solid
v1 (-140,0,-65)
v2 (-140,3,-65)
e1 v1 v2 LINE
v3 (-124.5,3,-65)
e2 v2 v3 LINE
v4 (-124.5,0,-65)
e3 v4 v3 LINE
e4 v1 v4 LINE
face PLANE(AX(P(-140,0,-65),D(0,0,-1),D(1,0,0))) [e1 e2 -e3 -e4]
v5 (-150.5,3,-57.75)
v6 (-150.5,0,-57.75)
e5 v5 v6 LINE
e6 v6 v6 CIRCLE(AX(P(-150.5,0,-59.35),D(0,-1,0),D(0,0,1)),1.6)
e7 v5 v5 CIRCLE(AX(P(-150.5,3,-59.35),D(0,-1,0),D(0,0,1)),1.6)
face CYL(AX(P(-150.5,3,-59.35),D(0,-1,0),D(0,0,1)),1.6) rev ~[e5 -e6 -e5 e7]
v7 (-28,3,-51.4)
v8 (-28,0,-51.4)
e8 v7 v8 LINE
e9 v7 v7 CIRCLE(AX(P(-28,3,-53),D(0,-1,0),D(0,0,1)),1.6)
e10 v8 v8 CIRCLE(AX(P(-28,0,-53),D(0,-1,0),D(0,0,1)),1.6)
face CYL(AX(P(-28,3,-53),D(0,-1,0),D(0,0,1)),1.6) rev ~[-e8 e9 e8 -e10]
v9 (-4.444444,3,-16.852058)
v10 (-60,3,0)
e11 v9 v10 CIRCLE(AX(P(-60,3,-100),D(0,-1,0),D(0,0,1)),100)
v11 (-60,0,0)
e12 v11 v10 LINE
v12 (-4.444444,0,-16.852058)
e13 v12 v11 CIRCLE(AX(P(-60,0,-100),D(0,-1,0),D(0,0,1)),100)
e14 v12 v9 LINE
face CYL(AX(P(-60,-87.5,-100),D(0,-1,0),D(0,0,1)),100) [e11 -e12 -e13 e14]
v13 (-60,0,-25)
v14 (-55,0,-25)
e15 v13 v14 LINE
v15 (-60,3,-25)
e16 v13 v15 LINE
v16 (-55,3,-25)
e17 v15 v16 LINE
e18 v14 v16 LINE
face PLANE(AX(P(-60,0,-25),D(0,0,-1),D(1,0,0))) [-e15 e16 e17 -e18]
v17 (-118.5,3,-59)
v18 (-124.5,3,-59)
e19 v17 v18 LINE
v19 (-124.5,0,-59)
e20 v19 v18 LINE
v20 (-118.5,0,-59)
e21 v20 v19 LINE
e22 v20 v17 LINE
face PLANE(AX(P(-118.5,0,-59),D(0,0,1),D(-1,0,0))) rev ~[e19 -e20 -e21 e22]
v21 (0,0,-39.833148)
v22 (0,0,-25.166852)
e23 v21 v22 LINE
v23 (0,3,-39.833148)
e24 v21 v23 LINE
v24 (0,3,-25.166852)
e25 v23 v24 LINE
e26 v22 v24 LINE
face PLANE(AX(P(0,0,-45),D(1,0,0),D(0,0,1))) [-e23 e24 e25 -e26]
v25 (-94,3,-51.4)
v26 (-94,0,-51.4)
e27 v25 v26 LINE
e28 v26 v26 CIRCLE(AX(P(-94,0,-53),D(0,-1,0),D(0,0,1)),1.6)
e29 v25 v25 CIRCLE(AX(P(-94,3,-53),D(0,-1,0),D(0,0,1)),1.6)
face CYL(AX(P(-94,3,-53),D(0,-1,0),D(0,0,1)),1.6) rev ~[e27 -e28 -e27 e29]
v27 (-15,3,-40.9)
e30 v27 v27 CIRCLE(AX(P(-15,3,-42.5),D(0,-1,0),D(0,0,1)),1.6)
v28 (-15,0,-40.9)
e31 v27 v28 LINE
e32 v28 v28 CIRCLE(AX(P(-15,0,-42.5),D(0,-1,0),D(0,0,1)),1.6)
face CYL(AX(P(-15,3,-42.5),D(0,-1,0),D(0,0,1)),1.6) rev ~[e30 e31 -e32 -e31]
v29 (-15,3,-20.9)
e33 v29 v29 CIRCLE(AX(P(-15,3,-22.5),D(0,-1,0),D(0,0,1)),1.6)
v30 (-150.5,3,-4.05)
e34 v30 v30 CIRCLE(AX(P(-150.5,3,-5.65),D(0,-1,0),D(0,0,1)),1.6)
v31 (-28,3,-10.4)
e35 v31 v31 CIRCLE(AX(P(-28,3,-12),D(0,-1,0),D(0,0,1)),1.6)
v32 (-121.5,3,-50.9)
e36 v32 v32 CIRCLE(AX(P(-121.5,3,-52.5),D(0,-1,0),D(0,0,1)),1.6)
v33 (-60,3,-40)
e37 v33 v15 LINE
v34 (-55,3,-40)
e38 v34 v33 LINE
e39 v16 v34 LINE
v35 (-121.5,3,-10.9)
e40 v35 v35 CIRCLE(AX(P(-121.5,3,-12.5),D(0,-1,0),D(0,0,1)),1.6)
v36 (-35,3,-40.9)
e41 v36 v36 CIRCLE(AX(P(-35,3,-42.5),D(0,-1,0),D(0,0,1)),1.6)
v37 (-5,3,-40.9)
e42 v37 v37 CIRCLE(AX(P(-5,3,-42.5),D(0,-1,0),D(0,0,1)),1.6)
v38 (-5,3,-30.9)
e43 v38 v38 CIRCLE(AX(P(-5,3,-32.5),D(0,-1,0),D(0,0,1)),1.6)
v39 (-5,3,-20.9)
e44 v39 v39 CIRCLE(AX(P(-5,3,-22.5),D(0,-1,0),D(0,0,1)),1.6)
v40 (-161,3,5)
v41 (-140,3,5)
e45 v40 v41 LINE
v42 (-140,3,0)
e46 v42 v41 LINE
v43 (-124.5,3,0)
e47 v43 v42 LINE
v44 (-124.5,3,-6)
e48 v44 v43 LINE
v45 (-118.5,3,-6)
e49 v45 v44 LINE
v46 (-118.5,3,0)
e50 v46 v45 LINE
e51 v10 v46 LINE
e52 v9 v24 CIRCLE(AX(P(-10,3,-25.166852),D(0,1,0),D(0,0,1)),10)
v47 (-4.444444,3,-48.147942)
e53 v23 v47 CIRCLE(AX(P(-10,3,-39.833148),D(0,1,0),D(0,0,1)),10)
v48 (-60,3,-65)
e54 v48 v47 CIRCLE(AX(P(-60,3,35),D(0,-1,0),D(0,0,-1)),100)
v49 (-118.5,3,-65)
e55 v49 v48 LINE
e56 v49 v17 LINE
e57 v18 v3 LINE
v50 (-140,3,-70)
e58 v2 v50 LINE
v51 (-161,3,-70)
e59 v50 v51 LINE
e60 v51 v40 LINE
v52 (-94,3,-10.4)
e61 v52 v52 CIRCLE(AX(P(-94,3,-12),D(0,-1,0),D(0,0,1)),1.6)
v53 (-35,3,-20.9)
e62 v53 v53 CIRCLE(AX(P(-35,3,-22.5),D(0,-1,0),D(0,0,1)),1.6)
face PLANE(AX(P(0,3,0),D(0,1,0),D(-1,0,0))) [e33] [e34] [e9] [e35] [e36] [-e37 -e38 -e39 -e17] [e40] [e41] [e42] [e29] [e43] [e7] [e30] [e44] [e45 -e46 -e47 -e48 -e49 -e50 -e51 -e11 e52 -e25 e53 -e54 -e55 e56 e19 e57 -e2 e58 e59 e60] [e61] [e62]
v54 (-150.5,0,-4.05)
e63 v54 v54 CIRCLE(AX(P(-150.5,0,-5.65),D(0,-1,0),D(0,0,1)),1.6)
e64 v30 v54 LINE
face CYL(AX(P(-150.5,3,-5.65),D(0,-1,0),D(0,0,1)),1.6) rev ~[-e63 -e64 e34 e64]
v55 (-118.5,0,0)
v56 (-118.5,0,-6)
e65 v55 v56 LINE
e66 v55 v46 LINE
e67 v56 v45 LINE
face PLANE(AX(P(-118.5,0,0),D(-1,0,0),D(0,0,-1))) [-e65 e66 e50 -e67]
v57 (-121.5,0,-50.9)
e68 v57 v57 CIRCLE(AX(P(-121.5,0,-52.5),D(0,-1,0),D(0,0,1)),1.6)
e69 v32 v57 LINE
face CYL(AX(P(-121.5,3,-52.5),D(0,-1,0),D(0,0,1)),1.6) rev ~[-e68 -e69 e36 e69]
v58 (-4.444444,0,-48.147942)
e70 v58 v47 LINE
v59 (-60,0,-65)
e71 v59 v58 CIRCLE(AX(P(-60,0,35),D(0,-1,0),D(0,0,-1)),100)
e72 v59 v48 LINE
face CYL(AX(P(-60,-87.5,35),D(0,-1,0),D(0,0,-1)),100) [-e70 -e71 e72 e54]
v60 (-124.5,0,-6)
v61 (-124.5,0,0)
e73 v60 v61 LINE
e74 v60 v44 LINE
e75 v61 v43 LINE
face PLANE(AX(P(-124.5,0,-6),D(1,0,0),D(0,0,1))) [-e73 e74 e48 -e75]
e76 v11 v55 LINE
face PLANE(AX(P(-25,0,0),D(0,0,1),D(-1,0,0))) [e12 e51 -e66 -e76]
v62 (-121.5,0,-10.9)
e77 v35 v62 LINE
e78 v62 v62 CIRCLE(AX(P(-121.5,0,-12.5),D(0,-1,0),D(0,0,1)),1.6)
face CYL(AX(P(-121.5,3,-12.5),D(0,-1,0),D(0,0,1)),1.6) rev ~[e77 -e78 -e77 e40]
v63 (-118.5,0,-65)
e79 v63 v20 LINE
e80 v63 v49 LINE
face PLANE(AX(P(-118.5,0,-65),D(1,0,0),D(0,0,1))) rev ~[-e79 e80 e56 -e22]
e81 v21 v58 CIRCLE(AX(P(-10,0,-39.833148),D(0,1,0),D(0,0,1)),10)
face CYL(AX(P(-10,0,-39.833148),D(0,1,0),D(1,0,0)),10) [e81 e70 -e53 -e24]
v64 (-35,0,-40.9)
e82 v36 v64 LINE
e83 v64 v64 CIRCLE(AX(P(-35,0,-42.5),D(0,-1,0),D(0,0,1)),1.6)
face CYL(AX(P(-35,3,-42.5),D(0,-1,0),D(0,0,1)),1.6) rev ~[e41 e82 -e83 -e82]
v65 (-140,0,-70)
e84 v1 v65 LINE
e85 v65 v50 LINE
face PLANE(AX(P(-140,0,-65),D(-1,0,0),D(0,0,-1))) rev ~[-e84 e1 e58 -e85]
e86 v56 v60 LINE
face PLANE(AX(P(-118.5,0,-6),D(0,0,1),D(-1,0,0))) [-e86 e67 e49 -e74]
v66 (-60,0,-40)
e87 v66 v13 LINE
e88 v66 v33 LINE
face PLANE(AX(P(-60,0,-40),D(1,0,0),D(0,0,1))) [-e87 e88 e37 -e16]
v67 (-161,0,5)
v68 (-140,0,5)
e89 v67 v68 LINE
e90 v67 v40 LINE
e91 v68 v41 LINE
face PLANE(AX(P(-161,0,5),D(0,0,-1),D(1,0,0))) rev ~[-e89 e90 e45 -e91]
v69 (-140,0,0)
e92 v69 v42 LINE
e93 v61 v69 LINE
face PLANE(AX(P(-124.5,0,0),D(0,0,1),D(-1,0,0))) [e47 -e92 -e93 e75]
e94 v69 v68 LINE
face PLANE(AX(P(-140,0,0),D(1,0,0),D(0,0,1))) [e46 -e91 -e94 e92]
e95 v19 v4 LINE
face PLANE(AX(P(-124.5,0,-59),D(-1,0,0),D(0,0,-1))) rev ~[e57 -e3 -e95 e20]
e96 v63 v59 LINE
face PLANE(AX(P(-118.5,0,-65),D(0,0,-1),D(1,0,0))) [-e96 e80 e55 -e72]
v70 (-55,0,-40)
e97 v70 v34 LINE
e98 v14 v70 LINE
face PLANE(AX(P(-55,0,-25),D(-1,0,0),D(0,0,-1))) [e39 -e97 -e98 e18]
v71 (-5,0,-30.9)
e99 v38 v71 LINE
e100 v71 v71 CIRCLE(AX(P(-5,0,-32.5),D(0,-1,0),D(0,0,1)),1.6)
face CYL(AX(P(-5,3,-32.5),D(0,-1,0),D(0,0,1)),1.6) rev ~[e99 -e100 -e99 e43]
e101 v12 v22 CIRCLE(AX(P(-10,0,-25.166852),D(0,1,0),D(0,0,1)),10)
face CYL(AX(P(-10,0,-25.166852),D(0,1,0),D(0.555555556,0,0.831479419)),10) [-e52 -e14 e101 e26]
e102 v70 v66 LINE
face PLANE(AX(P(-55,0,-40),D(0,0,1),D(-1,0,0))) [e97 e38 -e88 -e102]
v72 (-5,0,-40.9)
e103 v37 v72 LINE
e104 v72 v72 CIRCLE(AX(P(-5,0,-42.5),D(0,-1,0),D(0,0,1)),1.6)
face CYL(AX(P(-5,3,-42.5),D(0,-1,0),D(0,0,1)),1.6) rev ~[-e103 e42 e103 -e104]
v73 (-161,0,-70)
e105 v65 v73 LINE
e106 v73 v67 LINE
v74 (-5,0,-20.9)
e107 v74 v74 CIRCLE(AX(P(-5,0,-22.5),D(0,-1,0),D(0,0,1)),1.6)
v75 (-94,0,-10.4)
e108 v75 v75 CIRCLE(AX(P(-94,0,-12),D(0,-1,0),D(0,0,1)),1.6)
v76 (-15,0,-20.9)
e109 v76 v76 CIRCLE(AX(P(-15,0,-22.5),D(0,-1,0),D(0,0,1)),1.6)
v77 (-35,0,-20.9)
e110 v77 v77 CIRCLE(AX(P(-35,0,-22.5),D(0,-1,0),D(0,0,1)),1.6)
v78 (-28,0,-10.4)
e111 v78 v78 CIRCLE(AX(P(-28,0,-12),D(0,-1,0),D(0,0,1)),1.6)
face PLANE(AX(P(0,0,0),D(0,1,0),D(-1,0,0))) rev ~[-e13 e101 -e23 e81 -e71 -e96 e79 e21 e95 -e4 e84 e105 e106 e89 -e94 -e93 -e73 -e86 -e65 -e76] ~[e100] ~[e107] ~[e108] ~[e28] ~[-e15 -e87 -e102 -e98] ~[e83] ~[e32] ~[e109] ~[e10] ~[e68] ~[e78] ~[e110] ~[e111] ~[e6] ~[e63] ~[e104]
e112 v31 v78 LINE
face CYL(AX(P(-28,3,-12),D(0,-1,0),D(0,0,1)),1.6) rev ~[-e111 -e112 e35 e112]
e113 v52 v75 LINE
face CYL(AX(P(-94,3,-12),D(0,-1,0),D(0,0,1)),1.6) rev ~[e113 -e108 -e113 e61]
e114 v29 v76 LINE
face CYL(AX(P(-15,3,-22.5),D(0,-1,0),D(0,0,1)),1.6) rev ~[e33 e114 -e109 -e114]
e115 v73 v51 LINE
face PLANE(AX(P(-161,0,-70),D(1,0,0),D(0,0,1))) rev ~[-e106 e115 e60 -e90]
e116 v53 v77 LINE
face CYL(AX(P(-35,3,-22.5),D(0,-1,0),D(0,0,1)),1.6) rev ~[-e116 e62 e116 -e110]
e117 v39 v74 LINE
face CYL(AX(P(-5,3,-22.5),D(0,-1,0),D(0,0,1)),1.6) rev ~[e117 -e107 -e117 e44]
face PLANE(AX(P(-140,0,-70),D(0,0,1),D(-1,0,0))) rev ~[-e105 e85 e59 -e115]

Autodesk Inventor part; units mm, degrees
ref_plane "YZ Plane" through (0, 0, 0) normal (1, 0, 0) x (0, 1, 0)
ref_plane "XZ Plane" through (0, 0, 0) normal (0, 1, 0) x (-1, 0, 0)
ref_plane "XY Plane" through (0, 0, 0) normal (0, 0, 1) x (1, 0, 0)
sketch "スケッチ1" plane through (0, 0, 0) normal (0, 1, 0) x (-1, 0, 0)
  line L0 (0, 0) -> (140, 0)
  line L1 (140, -65) -> (0, -65)
  line L2 (0, -65) -> (0, 0)
  line L3 (124.5, 0) -> (118.5, 0)
  line L4 (118.5, 0) -> (118.5, -6)
  line L5 (118.5, -6) -> (124.5, -6)
  line L6 (124.5, -6) -> (124.5, 0)
  line L7 (124.5, -65) -> (118.5, -65)
  line L8 (118.5, -65) -> (118.5, -59)
  line L9 (118.5, -59) -> (124.5, -59)
  line L10 (124.5, -59) -> (124.5, -65)
  line L11 (0, -45) -> (25, -65)
  line L12 (0, -20) -> (25, 0)
  line L13 (60, -25) -> (55, -25)
  line L14 (55, -25) -> (55, -40)
  line L15 (55, -40) -> (60, -40)
  line L16 (60, -40) -> (60, -25)
  line L17 (140, -70) -> (161, -70)
  line L18 (161, -70) -> (161, 5)
  line L19 (161, 5) -> (140, 5)
  line L20 (140, -65) -> (140, -70)
  line L21 (140, 0) -> (140, 5)
  point P0 (124.5, -3)
  point P1 (124.5, -62)
  point P2 (118.5, 0)
  dimension "d0" = 140
  dimension "d1" = 65
  dimension "d61" = 6
  dimension "d62" = 6
  dimension "d63" = 6
  dimension "d64" = 6
  dimension "d66" = 20
  dimension "d67" = 20
  dimension "d68" = 25
  dimension "d70" = 5
  dimension "d71" = 15
  dimension "d73" = 25
  dimension "d103" = 21
  dimension "d104" = 75
  dimension "d105" = 5
extrude "押し出し1" add sketch "スケッチ1" along normal blind 3 contours L0 L4 L5 L6 L21 L19 L18 L17 L20 L1 L10 L9 L8 L11 L2 L12
sketch "スケッチ2" plane through (0, 3, 0) normal (0, 1, 0) x (1, 0, 0)
  line L0 (-140, 0) -> (0, 0) projected
  line L1 (-25, 65) -> (-140, 65) projected
  line L2 (-140, 65) -> (-140, 70) projected
  point P0 (-121.5, 12.5)
  point P1 (0, 65)
  point P2 (-121.5, 52.5)
  dimension "d9" = 12.5
  dimension "d55" = 12.5
  dimension "d69" = 40
  dimension "d107" = 18.5
hole "穴1" at (-121.5, 3, -12.5) at (-121.5, 3, -52.5) direction (0, -1, 0) diameter 3.2 end through all
sketch "スケッチ3" plane through (0, 3, 0) normal (0, 1, 0) x (1, 0, 0)
  line L0 (-140, 0) -> (0, 0) projected
  line L1 (-25, 65) -> (-140, 65) projected
  line L2 (0, 0) -> (0, 45) projected
  point P0 (-35, 22.5)
  point P1 (-35, 42.5)
  point P2 (-15, 42.5)
  point P3 (-15, 22.5)
  point P4 (0, 65)
  dimension "d20" = 20
  dimension "d21" = 20
  dimension "d22" = 22.5
  dimension "d24" = 15
hole "穴2" at (-35, 3, -22.5) at (-35, 3, -42.5) at (-15, 3, -42.5) at (-15, 3, -22.5) direction (0, -1, 0) diameter 3.2 end through all
sketch "スケッチ4" plane through (0, 3, 0) normal (0, 1, 0) x (1, 0, 0)
  line L0 (-25, 65) -> (-140, 65) projected
  line L1 (0, 0) -> (0, 45) projected
  point P0 (-5, 42.5)
  point P1 (-5, 32.5)
  point P2 (-5, 22.5)
  point P3 (0, 65)
  dimension "d32" = 10
  dimension "d33" = 10
  dimension "d34" = 32.5
  dimension "d35" = 5
hole "穴3" at (-5, 3, -42.5) at (-5, 3, -32.5) at (-5, 3, -22.5) direction (0, -1, 0) diameter 3.2 end through all
sketch "スケッチ5" plane through (0, 3, 0) normal (0, 1, 0) x (1, 0, 0)
  line L0 (-25, 65) -> (-140, 65) projected
  line L1 (-140, 65) -> (-140, 0) projected
  line L2 (-140, 65) -> (-140, 70) projected
  point P0 (0, 0)
  point P1 (-94, 53)
  point P2 (-28, 53)
  point P3 (-28, 12)
  point P4 (-94, 12)
  point P5 (0, 65)
  dimension "d43" = 66
  dimension "d44" = 41
  dimension "d46" = 12
  dimension "d106" = 46
hole "穴4" at (-94, 3, -53) at (-28, 3, -53) at (-28, 3, -12) at (-94, 3, -12) direction (0, -1, 0) diameter 3.2 end through all
sketch "スケッチ8" plane through (0, 3, 0) normal (0, 1, 0) x (1, 0, 0)
  line L0 (-140, 70) -> (-161, 70) projected
  line L1 (-161, 70) -> (-161, -5) projected
  point P0 (0, 0)
  point P1 (-150.5, 59.35)
  point P2 (-150.5, 5.65)
  dimension "d108" = 10.65
  dimension "d109" = 10.5
  dimension "d110" = 53.7
hole "穴5" at (-150.5, 3, -59.35) at (-150.5, 3, -5.65) direction (0, -1, 0) diameter 3.2 end through all
sketch "スケッチ7" plane through (0, 3, 0) normal (0, 1, 0) x (1, 0, 0)
  line L0 (-140, 65) -> (-124.5, 65)
  line L1 (-124.5, 59) -> (-124.5, 65) projected
  line L2 (-124.5, 65) -> (-124.5, 59)
  line L3 (-118.5, 59) -> (-124.5, 59) projected
  line L4 (-124.5, 59) -> (-118.5, 59)
  line L5 (-118.5, 65) -> (-118.5, 59) projected
  line L6 (-118.5, 59) -> (-118.5, 65)
  line L7 (-118.5, 65) -> (-60.0781, 65)
  line L8 (0, 39.7809) -> (0, 25.2191)
  line L9 (-60.0781, 0) -> (-118.5, 0)
  line L10 (-118.5, 0) -> (-118.5, 6)
  line L11 (-118.5, 6) -> (-124.5, 6)
  line L12 (-124.5, 6) -> (-124.5, 0)
  line L13 (-124.5, 0) -> (-140, 0)
  circle A0 centre (-121.5, 52.5) radius 1.6
  circle A1 centre (-121.5, 12.5) radius 1.6
  line L14 (-60, 40) -> (-55, 40) projected
  line L15 (-55, 40) -> (-55, 25) projected
  line L16 (-60, 40) -> (-55, 40)
  line L17 (-55, 40) -> (-55, 25)
  line L18 (-55, 25) -> (-60, 25)
  line L19 (-60, 25) -> (-60, 40)
  circle A2 centre (-94, 53) radius 1.6
  circle A3 centre (-94, 12) radius 1.6
  circle A4 centre (-28, 53) radius 1.6
  circle A5 centre (-28, 12) radius 1.6
  circle A6 centre (-35, 42.5) radius 1.6
  circle A7 centre (-15, 42.5) radius 1.6
  circle A8 centre (-35, 22.5) radius 1.6
  circle A9 centre (-15, 22.5) radius 1.6
  circle A10 centre (-5, 42.5) radius 1.6
  circle A11 centre (-5, 32.5) radius 1.6
  circle A12 centre (-5, 22.5) radius 1.6
  line L20 (-140, 65) -> (-140, 70)
  line L21 (-140, 70) -> (-161, 70) projected
  line L22 (-140, 70) -> (-161, 70)
  line L23 (-161, 70) -> (-161, -5) projected
  line L24 (-161, 70) -> (-161, -5)
  line L25 (-161, -5) -> (-140, -5) projected
  line L26 (-161, -5) -> (-140, -5)
  line L27 (-140, -5) -> (-140, 0) projected
  line L28 (-140, -5) -> (-140, 0)
  circle A13 centre (-150.5, 59.35) radius 1.6 projected
  circle A14 centre (-150.5, 59.35) radius 1.6
  circle A15 centre (-150.5, 5.65) radius 1.6
  arc A16 (-60.0781, 0) -> (-4.4358, 16.9101) centre (-60.0781, 100) ccw
  arc A17 (-4.4358, 48.0899) -> (-60.0781, 65) centre (-60.0781, -35) ccw
  arc A18 (0, 39.7809) -> (-4.4358, 48.0899) centre (-10, 39.7809) ccw
  arc A19 (-4.4358, 16.9101) -> (0, 25.2191) centre (-10, 25.2191) ccw
  point P0 (0, 0)
  point P1 (-25, 65)
  point P2 (0, 45)
  point P3 (-25, 0)
  point P4 (0, 20)
  dimension "d74" = 3.2
  dimension "d75" = 3.2
  dimension "d77" = 40
  dimension "d79" = 3.2
  dimension "d80" = 3.2
  dimension "d81" = 3.2
  dimension "d82" = 3.2
  dimension "d83" = 41
  dimension "d86" = 66
  dimension "d87" = 3.2
  dimension "d88" = 3.2
  dimension "d89" = 3.2
  dimension "d90" = 3.2
  dimension "d91" = 20
  dimension "d92" = 20
  dimension "d94" = 15
  dimension "d95" = 3.2
  dimension "d96" = 3.2
  dimension "d97" = 3.2
  dimension "d98" = 10
  dimension "d99" = 10
  dimension "d100" = 5
  dimension "d118" = 18.5
  dimension "d119" = 46
  dimension "d121" = 161
  dimension "d123" = 3.2
  dimension "d124" = 3.2
  dimension "d125" = 10.5
  dimension "d126" = 10.65
  dimension "d127" = 53.7
  dimension "d129" = 6
  dimension "d133" = 100
  dimension "d134" = 10
  dimension "d138" = 32.5
  dimension "d139" = 22.5
  dimension "d140" = 12
  dimension "d141" = 16.9101
  dimension "d142" = 16.9101
fillet "フィレット1" radius 100 1 edges at (-25, 1.5, 0)
fillet "フィレット2" radius 100 1 edges at (-25, 1.5, -65)
fillet "フィレット3" radius 10 1 edges at (0, 1.5, -20)
fillet "フィレット4" radius 10 1 edges at (0, 1.5, -45)
properties material "アクリル"
